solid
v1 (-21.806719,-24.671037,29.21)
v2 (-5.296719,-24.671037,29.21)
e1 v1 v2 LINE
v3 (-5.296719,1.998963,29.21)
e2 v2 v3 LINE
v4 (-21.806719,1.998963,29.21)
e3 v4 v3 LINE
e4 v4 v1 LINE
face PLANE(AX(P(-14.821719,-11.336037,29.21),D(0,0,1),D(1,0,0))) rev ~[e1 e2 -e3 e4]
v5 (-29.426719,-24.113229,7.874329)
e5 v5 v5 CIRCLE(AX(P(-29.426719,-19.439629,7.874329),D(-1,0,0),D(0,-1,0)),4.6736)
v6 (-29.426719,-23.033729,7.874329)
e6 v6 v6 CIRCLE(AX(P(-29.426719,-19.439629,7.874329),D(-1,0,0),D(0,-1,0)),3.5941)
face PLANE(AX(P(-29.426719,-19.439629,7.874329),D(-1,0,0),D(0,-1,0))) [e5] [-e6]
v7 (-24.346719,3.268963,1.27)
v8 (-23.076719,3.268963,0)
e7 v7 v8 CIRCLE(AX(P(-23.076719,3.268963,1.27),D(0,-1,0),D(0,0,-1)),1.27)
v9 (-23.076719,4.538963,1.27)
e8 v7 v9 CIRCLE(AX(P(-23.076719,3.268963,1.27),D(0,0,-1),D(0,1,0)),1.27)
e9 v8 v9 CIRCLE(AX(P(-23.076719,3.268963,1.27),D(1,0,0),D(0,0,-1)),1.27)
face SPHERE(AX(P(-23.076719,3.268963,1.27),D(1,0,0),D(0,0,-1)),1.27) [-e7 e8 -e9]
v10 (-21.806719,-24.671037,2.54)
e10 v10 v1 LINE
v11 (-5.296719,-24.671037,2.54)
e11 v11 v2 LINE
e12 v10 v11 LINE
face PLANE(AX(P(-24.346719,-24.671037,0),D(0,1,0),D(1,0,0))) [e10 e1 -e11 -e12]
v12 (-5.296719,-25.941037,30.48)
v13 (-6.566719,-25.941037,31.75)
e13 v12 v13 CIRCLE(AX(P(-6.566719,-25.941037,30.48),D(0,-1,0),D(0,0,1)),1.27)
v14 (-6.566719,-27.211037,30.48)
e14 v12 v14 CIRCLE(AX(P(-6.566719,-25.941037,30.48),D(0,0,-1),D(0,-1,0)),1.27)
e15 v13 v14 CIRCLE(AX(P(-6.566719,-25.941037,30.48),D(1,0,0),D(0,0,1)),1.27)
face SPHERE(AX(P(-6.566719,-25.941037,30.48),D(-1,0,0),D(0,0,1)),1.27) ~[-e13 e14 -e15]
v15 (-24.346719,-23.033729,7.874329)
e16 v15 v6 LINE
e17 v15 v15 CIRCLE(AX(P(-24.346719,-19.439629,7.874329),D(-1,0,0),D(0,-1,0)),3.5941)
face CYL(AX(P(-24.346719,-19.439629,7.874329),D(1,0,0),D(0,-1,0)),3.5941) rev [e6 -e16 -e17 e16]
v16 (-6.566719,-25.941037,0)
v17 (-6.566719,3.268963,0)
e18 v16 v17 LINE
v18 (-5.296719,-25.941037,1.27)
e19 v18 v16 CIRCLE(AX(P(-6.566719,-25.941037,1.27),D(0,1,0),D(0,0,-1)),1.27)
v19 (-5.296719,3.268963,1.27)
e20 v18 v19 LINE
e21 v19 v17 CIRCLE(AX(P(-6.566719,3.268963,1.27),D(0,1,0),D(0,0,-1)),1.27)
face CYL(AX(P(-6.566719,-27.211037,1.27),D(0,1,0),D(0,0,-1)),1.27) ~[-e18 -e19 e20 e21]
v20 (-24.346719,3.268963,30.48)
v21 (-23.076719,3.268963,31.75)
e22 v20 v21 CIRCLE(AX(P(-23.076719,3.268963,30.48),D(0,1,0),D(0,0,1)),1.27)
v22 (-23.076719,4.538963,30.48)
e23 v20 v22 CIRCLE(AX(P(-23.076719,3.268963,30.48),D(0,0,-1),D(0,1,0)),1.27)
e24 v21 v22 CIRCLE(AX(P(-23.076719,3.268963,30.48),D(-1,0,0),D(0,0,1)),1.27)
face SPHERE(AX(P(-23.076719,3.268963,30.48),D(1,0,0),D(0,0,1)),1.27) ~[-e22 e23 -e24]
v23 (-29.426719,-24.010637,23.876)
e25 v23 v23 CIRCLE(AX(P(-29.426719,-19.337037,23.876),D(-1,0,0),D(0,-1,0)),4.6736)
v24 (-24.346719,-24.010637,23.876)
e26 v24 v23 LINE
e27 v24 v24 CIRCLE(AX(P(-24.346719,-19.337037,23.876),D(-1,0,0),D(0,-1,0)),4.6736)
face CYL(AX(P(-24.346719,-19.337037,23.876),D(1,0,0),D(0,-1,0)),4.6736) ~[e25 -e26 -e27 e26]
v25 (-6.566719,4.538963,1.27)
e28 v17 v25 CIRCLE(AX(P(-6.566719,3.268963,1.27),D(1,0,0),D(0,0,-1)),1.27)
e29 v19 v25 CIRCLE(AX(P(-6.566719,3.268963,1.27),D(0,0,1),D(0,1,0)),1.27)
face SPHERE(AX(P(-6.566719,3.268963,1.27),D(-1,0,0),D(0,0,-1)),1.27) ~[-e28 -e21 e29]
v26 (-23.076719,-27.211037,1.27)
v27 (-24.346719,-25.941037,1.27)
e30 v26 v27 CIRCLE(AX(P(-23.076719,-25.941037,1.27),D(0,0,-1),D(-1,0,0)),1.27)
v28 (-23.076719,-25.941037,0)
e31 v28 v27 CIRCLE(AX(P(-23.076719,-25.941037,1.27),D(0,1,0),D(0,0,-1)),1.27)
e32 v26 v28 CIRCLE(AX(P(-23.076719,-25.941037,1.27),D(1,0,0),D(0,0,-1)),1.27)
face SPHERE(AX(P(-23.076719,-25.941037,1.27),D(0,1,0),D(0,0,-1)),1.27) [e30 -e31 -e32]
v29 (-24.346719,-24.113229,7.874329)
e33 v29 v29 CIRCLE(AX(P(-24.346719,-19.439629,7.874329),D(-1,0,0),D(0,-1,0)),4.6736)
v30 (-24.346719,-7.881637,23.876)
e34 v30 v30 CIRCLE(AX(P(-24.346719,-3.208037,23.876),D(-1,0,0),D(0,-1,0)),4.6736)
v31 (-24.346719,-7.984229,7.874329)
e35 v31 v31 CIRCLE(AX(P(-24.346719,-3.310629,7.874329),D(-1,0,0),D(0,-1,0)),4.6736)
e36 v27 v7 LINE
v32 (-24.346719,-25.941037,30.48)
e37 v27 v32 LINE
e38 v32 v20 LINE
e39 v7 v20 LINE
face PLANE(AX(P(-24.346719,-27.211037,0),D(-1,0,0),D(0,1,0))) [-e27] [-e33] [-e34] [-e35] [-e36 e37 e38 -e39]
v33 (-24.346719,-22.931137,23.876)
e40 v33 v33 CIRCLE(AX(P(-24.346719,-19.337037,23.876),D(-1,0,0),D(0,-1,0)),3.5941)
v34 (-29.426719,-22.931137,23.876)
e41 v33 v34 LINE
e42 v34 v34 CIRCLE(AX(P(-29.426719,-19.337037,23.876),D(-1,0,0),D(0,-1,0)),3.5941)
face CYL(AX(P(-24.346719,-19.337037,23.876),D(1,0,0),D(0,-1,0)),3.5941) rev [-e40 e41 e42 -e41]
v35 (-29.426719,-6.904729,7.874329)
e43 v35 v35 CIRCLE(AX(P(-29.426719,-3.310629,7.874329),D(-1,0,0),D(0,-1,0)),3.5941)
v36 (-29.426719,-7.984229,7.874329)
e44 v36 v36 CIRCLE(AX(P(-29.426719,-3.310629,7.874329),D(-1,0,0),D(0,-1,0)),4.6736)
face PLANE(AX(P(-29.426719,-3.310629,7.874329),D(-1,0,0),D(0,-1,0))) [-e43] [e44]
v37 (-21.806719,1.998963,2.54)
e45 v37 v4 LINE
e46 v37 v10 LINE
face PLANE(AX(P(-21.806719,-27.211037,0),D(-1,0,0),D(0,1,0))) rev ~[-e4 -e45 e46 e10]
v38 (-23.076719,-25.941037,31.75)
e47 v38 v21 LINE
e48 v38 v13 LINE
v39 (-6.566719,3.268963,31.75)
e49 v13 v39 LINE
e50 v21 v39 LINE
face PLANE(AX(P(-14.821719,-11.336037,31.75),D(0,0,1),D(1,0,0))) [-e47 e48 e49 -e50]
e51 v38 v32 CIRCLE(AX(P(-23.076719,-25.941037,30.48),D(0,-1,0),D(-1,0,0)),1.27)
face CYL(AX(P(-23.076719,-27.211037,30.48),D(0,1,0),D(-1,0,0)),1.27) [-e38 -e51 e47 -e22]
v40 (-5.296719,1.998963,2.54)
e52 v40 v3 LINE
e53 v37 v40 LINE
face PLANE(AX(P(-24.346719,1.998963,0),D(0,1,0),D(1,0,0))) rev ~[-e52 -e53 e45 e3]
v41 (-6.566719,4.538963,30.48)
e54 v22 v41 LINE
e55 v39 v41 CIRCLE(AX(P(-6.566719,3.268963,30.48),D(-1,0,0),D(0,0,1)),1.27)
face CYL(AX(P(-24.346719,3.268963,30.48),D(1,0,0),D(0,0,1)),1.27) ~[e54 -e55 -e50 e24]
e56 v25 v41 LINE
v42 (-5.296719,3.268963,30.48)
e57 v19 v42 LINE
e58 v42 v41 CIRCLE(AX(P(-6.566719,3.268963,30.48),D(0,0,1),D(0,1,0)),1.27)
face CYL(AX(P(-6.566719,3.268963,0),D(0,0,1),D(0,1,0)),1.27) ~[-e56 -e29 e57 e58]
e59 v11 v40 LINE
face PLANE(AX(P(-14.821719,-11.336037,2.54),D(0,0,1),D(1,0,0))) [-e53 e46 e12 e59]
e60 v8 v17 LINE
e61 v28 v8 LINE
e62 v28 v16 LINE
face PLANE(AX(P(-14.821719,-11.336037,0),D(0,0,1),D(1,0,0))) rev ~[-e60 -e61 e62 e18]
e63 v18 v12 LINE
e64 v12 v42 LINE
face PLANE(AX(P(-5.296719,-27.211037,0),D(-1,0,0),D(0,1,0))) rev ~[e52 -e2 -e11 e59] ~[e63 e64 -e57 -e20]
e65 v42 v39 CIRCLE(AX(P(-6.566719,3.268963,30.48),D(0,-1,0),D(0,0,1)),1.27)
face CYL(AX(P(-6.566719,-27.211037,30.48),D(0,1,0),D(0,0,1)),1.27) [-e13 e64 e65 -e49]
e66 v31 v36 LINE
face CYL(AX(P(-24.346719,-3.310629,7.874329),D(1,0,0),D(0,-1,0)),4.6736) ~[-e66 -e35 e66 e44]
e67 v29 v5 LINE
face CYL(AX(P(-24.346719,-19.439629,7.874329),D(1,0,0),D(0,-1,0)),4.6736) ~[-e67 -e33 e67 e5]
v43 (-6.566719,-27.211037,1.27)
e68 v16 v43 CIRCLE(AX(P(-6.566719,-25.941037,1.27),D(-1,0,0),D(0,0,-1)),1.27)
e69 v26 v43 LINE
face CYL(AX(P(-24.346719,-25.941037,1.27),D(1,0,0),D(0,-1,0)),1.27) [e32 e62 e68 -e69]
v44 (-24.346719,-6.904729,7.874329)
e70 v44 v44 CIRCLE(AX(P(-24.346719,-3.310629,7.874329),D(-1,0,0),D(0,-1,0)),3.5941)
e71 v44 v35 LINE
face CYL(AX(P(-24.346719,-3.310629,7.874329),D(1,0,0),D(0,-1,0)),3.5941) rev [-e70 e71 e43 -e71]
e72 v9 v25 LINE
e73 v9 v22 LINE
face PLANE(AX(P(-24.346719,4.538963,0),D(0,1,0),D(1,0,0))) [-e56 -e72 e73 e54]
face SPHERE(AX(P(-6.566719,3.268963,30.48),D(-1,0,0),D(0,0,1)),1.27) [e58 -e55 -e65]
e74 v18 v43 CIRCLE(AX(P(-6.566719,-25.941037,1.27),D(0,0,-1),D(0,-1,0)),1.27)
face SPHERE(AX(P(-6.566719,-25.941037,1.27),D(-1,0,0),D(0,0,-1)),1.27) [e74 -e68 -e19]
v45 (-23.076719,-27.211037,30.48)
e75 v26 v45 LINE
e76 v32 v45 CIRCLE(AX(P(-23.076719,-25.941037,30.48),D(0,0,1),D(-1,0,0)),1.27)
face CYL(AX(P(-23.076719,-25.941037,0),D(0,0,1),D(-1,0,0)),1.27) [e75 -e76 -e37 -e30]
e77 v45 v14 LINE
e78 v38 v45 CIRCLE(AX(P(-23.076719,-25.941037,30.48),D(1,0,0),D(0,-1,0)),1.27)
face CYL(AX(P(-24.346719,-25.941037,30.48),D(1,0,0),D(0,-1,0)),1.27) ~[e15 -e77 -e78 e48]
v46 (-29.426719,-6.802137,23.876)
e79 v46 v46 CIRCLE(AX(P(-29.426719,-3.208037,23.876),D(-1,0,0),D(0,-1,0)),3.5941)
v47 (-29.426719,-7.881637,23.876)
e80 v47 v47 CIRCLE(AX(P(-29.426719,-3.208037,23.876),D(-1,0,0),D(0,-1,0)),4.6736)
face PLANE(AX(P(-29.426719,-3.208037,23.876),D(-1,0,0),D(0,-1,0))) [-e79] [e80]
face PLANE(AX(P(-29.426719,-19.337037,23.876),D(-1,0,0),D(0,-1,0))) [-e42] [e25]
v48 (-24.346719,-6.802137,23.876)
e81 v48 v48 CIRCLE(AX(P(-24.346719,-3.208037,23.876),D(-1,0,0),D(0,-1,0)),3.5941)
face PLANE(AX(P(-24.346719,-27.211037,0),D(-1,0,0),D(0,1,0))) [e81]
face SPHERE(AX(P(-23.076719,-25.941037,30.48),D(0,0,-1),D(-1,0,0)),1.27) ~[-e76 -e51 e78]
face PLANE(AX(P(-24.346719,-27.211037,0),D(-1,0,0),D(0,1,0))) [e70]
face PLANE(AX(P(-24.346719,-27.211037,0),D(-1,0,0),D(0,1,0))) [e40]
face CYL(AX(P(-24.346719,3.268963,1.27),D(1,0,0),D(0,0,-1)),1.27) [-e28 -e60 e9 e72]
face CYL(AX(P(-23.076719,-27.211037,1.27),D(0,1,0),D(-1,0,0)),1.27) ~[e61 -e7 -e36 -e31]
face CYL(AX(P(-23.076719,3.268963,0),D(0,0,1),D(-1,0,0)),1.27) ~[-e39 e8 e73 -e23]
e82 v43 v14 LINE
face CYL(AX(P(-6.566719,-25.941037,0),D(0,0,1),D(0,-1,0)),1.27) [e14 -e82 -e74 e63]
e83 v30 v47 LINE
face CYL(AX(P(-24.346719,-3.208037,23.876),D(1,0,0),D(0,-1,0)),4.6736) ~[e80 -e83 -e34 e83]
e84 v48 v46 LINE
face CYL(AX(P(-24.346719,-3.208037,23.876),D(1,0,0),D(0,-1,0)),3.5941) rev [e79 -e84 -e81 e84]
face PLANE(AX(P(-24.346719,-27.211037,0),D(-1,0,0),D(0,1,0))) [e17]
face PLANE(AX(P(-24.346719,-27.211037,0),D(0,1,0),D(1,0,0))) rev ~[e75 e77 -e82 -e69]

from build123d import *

# Parameters (mm, degrees)
F0_W     = 19.05
F0_H     = 31.75
F1_DEPTH = 31.75
F2_T     = -2.54
F4_R     = 4.6736
F4_R_2   = 3.5941
F5_DEPTH = 5.08
F6_R     = 1.27


# Not quite as in the source:
# - a feature names something its author has since deleted; it is built from what else it names


with BuildPart() as f1:
    # F0 (on Top) → F1 (new body)
    with BuildSketch(Plane.XY):
        with Locations((-14.8217186228, -11.3360365331)):
            Rectangle(F0_W, F0_H)
    extrude(amount=F1_DEPTH)

    # F2
    f2_openings = [f1.faces().sort_by_distance(p)[0] for p in [
        (-5.296719, -11.336037, 15.875),
    ]]
    offset(amount=F2_T, openings=f2_openings)

    # F4 (on face) → F5 (join)
    with BuildSketch(Plane(origin=(-24.3467186228, 0, 0), x_dir=(0, -1, 0), z_dir=(-1, 0, 0))):
        with Locations((19.3370365331, 23.876)):
            Circle(F4_R)
        with Locations((19.3370365331, 23.876)):
            Circle(F4_R_2, mode=Mode.SUBTRACT)
        with Locations((3.2080365331, 23.876)):
            Circle(F4_R)
        with Locations((3.2080365331, 23.876)):
            Circle(F4_R_2, mode=Mode.SUBTRACT)
        with Locations((3.3106288512, 7.8743288743)):
            Circle(F4_R)
        with Locations((3.3106288512, 7.8743288743)):
            Circle(F4_R_2, mode=Mode.SUBTRACT)
        with Locations((19.4396288512, 7.8743288743)):
            Circle(F4_R)
        with Locations((19.4396288512, 7.8743288743)):
            Circle(F4_R_2, mode=Mode.SUBTRACT)
    extrude(amount=F5_DEPTH)

    # F6
    f6_edges = [f1.edges().sort_by_distance(p)[0] for p in [
        (-14.821719, 4.538963, 0),
        (-24.346719, -11.336037, 0),
        (-14.821719, -27.211037, 0),
        (-5.296719, -11.336037, 0),
        (-24.346719, -27.211037, 15.875),
        (-14.821719, 4.538963, 31.75),
        (-24.346719, -11.336037, 31.75),
        (-14.821719, -27.211037, 31.75),
        (-5.296719, -11.336037, 31.75),
        (-5.296719, -27.211037, 15.875),
        (-5.296719, 4.538963, 15.875),
        (-24.346719, 4.538963, 15.875),
    ]]
    fillet(f6_edges, radius=F6_R)


solid = f1.part
